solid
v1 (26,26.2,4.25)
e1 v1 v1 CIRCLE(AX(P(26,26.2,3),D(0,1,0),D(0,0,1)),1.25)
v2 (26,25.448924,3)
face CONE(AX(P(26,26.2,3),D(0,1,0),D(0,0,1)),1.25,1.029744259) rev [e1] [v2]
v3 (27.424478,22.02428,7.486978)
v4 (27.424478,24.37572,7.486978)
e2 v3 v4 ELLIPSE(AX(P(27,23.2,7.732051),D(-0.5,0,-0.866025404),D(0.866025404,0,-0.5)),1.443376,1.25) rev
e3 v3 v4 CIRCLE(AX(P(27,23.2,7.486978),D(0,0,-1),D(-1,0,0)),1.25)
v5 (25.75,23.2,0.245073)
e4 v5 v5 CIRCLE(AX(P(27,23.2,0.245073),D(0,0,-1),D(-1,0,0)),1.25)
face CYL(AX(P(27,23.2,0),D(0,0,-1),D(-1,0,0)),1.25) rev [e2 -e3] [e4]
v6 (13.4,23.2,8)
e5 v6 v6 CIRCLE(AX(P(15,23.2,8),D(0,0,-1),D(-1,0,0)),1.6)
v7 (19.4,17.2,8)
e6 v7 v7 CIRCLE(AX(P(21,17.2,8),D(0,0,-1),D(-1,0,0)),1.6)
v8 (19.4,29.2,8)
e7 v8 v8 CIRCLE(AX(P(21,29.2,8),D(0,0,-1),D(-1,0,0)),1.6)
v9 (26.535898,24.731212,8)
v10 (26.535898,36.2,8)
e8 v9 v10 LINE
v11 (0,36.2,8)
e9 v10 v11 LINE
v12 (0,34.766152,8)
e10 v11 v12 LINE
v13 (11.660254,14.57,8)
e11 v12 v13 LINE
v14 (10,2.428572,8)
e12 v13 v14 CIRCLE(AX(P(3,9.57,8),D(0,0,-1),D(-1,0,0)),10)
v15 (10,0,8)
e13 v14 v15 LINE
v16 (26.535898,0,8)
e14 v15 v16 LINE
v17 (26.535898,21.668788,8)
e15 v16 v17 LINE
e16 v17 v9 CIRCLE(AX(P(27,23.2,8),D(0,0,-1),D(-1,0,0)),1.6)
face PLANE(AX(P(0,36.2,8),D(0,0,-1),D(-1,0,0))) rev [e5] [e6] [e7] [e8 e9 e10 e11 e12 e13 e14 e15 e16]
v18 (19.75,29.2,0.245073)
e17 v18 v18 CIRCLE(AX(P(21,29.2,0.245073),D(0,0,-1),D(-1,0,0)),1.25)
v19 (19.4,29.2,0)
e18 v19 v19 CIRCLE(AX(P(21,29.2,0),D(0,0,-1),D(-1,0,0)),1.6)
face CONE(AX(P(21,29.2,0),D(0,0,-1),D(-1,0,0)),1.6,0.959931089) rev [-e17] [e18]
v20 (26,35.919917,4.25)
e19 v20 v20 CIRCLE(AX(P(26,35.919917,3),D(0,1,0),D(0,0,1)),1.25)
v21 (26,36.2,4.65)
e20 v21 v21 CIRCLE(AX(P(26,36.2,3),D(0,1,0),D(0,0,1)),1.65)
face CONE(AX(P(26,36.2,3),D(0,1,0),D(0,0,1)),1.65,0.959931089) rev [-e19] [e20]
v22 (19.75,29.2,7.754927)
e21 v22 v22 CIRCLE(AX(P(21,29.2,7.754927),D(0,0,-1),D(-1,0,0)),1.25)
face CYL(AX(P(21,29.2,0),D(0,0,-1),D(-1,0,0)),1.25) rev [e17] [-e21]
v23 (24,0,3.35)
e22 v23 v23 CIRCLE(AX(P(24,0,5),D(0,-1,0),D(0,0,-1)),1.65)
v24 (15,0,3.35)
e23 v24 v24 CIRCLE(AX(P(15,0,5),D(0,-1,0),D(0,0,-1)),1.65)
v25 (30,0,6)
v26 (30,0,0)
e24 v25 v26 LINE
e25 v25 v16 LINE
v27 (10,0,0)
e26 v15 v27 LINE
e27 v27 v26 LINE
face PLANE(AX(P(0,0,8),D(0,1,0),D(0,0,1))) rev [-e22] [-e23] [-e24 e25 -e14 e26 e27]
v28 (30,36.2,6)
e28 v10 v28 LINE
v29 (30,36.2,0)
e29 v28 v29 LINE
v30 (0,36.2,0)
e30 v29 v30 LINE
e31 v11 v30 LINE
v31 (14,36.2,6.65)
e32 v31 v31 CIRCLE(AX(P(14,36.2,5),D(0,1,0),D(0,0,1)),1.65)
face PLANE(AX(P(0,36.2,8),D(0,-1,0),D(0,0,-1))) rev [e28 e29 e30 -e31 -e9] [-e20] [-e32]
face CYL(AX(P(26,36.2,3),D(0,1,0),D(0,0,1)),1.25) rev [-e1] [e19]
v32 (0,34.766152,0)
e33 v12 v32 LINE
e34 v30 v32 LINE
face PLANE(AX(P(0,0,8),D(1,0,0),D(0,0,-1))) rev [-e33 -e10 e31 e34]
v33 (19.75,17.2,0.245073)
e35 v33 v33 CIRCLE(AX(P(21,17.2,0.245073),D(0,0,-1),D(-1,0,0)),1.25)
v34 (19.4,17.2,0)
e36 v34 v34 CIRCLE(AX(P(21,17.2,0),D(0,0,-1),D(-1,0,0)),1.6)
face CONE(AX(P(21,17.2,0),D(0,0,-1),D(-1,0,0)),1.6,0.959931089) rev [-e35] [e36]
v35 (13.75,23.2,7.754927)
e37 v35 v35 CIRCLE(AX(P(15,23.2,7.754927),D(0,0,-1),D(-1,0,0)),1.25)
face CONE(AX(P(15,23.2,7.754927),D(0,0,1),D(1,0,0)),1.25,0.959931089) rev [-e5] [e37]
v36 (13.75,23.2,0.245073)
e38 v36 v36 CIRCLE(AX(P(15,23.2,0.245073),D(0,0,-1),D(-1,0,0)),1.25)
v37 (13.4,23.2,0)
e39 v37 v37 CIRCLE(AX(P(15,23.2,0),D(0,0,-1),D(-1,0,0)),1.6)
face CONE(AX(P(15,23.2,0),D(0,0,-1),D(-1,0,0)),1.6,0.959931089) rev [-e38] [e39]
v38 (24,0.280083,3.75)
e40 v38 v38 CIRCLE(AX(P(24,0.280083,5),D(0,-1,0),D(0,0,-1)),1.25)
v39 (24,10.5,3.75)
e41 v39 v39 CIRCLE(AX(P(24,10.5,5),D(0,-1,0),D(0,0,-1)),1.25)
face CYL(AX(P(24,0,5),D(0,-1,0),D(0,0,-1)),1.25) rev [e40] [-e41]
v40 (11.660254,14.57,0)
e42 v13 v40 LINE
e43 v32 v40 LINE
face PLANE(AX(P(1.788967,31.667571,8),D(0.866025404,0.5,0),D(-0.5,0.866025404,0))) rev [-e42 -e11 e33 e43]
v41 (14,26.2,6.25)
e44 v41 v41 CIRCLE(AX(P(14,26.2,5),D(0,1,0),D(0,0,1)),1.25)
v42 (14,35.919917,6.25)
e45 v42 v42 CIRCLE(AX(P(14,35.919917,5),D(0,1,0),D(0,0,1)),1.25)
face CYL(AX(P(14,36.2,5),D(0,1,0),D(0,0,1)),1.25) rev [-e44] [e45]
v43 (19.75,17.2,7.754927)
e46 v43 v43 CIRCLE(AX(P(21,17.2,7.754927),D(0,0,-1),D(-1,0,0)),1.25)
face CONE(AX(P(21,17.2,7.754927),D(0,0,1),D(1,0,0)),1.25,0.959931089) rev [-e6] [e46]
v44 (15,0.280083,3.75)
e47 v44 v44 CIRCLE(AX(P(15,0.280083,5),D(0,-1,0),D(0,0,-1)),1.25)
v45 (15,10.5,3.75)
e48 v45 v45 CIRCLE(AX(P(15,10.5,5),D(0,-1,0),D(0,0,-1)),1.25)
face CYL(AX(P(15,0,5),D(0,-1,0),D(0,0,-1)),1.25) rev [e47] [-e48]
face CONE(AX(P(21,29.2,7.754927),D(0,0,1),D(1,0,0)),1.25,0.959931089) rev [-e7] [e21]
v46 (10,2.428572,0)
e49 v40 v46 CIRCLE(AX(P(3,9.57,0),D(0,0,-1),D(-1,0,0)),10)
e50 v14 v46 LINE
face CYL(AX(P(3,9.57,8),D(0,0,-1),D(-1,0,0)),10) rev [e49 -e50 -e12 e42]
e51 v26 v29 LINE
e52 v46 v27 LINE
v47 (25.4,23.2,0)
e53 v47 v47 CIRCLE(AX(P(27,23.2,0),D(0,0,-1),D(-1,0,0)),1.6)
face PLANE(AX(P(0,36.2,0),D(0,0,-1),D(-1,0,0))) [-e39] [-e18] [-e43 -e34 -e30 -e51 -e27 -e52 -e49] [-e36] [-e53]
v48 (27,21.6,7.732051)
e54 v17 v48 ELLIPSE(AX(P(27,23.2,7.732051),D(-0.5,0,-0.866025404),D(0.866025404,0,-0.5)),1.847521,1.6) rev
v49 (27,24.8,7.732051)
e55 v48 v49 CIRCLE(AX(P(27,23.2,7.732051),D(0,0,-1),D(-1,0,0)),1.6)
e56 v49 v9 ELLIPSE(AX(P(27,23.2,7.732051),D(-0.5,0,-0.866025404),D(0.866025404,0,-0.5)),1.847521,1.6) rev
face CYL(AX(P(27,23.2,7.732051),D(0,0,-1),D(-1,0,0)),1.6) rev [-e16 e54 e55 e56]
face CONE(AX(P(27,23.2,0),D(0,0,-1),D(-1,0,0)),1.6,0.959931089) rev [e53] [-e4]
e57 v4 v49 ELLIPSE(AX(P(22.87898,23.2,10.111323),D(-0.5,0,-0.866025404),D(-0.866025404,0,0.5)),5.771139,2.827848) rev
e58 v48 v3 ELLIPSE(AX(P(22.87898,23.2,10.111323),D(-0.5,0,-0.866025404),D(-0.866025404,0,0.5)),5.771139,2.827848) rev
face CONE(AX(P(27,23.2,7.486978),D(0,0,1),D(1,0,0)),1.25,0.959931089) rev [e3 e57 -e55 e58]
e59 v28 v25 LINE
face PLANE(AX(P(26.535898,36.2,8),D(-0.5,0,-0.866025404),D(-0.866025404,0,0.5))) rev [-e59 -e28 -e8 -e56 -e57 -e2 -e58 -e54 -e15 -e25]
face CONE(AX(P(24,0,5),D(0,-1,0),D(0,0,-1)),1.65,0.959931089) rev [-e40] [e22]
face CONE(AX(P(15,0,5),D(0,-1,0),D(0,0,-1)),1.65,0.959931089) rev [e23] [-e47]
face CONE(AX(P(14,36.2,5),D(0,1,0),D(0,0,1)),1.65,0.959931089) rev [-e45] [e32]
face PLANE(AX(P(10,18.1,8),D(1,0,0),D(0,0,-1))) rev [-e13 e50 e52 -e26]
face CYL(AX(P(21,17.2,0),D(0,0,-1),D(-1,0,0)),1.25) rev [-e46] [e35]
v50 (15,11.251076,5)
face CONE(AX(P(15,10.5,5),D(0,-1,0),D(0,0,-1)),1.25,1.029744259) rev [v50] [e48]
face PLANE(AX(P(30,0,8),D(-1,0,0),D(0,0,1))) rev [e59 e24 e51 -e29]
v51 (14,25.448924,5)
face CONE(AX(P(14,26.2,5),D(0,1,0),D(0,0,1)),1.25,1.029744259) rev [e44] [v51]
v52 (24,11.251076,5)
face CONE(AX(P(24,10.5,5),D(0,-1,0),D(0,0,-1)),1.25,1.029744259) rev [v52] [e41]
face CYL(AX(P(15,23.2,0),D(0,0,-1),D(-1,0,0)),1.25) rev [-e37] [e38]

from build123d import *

# Parameters (mm, degrees)
SKETCH_1_W                  = 30
SKETCH_1_H                  = 36.2
EXTRUDE_1_DEPTH             = 8
CUT_EXTRUDE_1_DEPTH         = 48.691089314
CHAMFER_1_SIZE              = 2
CHAMFER_1_SIZE2             = 3.464101615
HOLE_WIZARD_M31_D           = 2.5
HOLE_WIZARD_M31_DEPTH       = 10.5
HOLE_WIZARD_M31_CSINK_D     = 3.3
HOLE_WIZARD_M31_CSINK_ANGLE = 110
HOLE_WIZARD_M31_TIP         = 0.751075774
HOLE_WIZARD_M32_D           = 2.5
HOLE_WIZARD_M32_DEPTH       = 10
HOLE_WIZARD_M32_CSINK_D     = 3.3
HOLE_WIZARD_M32_CSINK_ANGLE = 110
HOLE_WIZARD_M32_TIP         = 0.751075774


# Read off the part's stored shape, not the designer's step: Отверстие обработанное метчиком M35
with BuildPart() as part:
    # Эскиз1 → Бобышка-Вытянуть1 (new body)
    with BuildSketch(Plane.XY):
        with Locations((15, 18.1)):
            Rectangle(SKETCH_1_W, SKETCH_1_H)
    extrude(amount=EXTRUDE_1_DEPTH)

    # Эскиз2 → Вырез-Вытянуть1 (cut, through all)
    with BuildSketch(Plane(origin=(0, 0, 0), x_dir=(-1, 0, 0), z_dir=(0, 0, -1))):
        with BuildLine():
            Line((50.920424152, 122.962914197), (0, 34.766152423))
            Line((0, 34.766152423), (-11.660254038, 14.57))
            ThreePointArc((-11.660254038, 14.57), (-12.907797949, 8.215179054), (-10, 2.428571571))
            Line((-10, 2.428571571), (-10, 0))
            Line((-10, 0), (-10, -101.840848304))
            Line((-10, -101.840848304), (186.590983298, -155.115784424))
            Line((186.590983298, -155.115784424), (247.51140745, 69.687978076))
            Line((247.51140745, 69.687978076), (50.920424152, 122.962914197))
        make_face()
    extrude(amount=-CUT_EXTRUDE_1_DEPTH, mode=Mode.SUBTRACT)

    # Фаска1
    chamfer_1_edges = [part.edges().sort_by_distance(p)[0] for p in [
        (30, 18.1, 8),
    ]]
    chamfer_1_side = [part.faces().sort_by_distance(p)[0] for p in [
        (30, 18.1, 4),
    ]]
    chamfer(chamfer_1_edges, length=CHAMFER_1_SIZE, length2=CHAMFER_1_SIZE2, reference=chamfer_1_side[0])

    # Отверстие обработанное метчиком M31
    with Locations(Plane.XZ):
        with Locations((24, 5), (15, 5)):
            CounterSinkHole(HOLE_WIZARD_M31_D / 2, HOLE_WIZARD_M31_CSINK_D / 2, depth=HOLE_WIZARD_M31_DEPTH, counter_sink_angle=HOLE_WIZARD_M31_CSINK_ANGLE)
            with Locations((0, 0, -(HOLE_WIZARD_M31_DEPTH + HOLE_WIZARD_M31_TIP / 2))):  # 118° drill point
                Cone(0, HOLE_WIZARD_M31_D / 2, HOLE_WIZARD_M31_TIP, mode=Mode.SUBTRACT)

    # Отверстие обработанное метчиком M32
    with Locations(Plane(origin=(0, 36.2, 0), x_dir=(-1, 0, 0), z_dir=(0, 1, 0))):
        with Locations((-14, 5), (-26, 3)):
            CounterSinkHole(HOLE_WIZARD_M32_D / 2, HOLE_WIZARD_M32_CSINK_D / 2, depth=HOLE_WIZARD_M32_DEPTH, counter_sink_angle=HOLE_WIZARD_M32_CSINK_ANGLE)
            with Locations((0, 0, -(HOLE_WIZARD_M32_DEPTH + HOLE_WIZARD_M32_TIP / 2))):  # 118° drill point
                Cone(0, HOLE_WIZARD_M32_D / 2, HOLE_WIZARD_M32_TIP, mode=Mode.SUBTRACT)

    # Отверстие обработанное метчиком M35 outline → Отверстие обработанное метчиком M35 (revolve, cut)
    with BuildSketch(Plane(origin=(15, 23.2, 0), x_dir=(1, 0, 0), z_dir=(0, -1, 0))):
        Polygon((1.6, 8), (0, 8), (0, 0), (1.6, 0), (1.25, 0.245072638), (1.25, 7.754927362), align=None)
    revolve(axis=Axis((15, 23.2, 0), (0, 0, 1)), mode=Mode.SUBTRACT)

    # Hole Wizard M35 2 outline → Hole Wizard M35 2 (revolve, cut)
    with BuildSketch(Plane(origin=(27, 23.2, 0), x_dir=(1, 0, 0), z_dir=(0, -1, 0))):
        Polygon((1.6, 8), (0, 8), (0, 0), (1.6, 0), (1.25, 0.245072638), (1.25, 7.486978169), (1.6, 7.732050808), align=None)
    revolve(axis=Axis((27, 23.2, 0), (0, 0, 1)), mode=Mode.SUBTRACT)

    # Hole Wizard M35 3 outline → Hole Wizard M35 3 (revolve, cut)
    with BuildSketch(Plane(origin=(21, 17.2, 0), x_dir=(1, 0, 0), z_dir=(0, -1, 0))):
        Polygon((1.6, 8), (0, 8), (0, 0), (1.6, 0), (1.25, 0.245072638), (1.25, 7.754927362), align=None)
    revolve(axis=Axis((21, 17.2, 0), (0, 0, 1)), mode=Mode.SUBTRACT)

    # Hole Wizard M35 4 outline → Hole Wizard M35 4 (revolve, cut)
    with BuildSketch(Plane(origin=(21, 29.2, 0), x_dir=(1, 0, 0), z_dir=(0, -1, 0))):
        Polygon((1.6, 8), (0, 8), (0, 0), (1.6, 0), (1.25, 0.245072638), (1.25, 7.754927362), align=None)
    revolve(axis=Axis((21, 29.2, 0), (0, 0, 1)), mode=Mode.SUBTRACT)


solid = part.part
